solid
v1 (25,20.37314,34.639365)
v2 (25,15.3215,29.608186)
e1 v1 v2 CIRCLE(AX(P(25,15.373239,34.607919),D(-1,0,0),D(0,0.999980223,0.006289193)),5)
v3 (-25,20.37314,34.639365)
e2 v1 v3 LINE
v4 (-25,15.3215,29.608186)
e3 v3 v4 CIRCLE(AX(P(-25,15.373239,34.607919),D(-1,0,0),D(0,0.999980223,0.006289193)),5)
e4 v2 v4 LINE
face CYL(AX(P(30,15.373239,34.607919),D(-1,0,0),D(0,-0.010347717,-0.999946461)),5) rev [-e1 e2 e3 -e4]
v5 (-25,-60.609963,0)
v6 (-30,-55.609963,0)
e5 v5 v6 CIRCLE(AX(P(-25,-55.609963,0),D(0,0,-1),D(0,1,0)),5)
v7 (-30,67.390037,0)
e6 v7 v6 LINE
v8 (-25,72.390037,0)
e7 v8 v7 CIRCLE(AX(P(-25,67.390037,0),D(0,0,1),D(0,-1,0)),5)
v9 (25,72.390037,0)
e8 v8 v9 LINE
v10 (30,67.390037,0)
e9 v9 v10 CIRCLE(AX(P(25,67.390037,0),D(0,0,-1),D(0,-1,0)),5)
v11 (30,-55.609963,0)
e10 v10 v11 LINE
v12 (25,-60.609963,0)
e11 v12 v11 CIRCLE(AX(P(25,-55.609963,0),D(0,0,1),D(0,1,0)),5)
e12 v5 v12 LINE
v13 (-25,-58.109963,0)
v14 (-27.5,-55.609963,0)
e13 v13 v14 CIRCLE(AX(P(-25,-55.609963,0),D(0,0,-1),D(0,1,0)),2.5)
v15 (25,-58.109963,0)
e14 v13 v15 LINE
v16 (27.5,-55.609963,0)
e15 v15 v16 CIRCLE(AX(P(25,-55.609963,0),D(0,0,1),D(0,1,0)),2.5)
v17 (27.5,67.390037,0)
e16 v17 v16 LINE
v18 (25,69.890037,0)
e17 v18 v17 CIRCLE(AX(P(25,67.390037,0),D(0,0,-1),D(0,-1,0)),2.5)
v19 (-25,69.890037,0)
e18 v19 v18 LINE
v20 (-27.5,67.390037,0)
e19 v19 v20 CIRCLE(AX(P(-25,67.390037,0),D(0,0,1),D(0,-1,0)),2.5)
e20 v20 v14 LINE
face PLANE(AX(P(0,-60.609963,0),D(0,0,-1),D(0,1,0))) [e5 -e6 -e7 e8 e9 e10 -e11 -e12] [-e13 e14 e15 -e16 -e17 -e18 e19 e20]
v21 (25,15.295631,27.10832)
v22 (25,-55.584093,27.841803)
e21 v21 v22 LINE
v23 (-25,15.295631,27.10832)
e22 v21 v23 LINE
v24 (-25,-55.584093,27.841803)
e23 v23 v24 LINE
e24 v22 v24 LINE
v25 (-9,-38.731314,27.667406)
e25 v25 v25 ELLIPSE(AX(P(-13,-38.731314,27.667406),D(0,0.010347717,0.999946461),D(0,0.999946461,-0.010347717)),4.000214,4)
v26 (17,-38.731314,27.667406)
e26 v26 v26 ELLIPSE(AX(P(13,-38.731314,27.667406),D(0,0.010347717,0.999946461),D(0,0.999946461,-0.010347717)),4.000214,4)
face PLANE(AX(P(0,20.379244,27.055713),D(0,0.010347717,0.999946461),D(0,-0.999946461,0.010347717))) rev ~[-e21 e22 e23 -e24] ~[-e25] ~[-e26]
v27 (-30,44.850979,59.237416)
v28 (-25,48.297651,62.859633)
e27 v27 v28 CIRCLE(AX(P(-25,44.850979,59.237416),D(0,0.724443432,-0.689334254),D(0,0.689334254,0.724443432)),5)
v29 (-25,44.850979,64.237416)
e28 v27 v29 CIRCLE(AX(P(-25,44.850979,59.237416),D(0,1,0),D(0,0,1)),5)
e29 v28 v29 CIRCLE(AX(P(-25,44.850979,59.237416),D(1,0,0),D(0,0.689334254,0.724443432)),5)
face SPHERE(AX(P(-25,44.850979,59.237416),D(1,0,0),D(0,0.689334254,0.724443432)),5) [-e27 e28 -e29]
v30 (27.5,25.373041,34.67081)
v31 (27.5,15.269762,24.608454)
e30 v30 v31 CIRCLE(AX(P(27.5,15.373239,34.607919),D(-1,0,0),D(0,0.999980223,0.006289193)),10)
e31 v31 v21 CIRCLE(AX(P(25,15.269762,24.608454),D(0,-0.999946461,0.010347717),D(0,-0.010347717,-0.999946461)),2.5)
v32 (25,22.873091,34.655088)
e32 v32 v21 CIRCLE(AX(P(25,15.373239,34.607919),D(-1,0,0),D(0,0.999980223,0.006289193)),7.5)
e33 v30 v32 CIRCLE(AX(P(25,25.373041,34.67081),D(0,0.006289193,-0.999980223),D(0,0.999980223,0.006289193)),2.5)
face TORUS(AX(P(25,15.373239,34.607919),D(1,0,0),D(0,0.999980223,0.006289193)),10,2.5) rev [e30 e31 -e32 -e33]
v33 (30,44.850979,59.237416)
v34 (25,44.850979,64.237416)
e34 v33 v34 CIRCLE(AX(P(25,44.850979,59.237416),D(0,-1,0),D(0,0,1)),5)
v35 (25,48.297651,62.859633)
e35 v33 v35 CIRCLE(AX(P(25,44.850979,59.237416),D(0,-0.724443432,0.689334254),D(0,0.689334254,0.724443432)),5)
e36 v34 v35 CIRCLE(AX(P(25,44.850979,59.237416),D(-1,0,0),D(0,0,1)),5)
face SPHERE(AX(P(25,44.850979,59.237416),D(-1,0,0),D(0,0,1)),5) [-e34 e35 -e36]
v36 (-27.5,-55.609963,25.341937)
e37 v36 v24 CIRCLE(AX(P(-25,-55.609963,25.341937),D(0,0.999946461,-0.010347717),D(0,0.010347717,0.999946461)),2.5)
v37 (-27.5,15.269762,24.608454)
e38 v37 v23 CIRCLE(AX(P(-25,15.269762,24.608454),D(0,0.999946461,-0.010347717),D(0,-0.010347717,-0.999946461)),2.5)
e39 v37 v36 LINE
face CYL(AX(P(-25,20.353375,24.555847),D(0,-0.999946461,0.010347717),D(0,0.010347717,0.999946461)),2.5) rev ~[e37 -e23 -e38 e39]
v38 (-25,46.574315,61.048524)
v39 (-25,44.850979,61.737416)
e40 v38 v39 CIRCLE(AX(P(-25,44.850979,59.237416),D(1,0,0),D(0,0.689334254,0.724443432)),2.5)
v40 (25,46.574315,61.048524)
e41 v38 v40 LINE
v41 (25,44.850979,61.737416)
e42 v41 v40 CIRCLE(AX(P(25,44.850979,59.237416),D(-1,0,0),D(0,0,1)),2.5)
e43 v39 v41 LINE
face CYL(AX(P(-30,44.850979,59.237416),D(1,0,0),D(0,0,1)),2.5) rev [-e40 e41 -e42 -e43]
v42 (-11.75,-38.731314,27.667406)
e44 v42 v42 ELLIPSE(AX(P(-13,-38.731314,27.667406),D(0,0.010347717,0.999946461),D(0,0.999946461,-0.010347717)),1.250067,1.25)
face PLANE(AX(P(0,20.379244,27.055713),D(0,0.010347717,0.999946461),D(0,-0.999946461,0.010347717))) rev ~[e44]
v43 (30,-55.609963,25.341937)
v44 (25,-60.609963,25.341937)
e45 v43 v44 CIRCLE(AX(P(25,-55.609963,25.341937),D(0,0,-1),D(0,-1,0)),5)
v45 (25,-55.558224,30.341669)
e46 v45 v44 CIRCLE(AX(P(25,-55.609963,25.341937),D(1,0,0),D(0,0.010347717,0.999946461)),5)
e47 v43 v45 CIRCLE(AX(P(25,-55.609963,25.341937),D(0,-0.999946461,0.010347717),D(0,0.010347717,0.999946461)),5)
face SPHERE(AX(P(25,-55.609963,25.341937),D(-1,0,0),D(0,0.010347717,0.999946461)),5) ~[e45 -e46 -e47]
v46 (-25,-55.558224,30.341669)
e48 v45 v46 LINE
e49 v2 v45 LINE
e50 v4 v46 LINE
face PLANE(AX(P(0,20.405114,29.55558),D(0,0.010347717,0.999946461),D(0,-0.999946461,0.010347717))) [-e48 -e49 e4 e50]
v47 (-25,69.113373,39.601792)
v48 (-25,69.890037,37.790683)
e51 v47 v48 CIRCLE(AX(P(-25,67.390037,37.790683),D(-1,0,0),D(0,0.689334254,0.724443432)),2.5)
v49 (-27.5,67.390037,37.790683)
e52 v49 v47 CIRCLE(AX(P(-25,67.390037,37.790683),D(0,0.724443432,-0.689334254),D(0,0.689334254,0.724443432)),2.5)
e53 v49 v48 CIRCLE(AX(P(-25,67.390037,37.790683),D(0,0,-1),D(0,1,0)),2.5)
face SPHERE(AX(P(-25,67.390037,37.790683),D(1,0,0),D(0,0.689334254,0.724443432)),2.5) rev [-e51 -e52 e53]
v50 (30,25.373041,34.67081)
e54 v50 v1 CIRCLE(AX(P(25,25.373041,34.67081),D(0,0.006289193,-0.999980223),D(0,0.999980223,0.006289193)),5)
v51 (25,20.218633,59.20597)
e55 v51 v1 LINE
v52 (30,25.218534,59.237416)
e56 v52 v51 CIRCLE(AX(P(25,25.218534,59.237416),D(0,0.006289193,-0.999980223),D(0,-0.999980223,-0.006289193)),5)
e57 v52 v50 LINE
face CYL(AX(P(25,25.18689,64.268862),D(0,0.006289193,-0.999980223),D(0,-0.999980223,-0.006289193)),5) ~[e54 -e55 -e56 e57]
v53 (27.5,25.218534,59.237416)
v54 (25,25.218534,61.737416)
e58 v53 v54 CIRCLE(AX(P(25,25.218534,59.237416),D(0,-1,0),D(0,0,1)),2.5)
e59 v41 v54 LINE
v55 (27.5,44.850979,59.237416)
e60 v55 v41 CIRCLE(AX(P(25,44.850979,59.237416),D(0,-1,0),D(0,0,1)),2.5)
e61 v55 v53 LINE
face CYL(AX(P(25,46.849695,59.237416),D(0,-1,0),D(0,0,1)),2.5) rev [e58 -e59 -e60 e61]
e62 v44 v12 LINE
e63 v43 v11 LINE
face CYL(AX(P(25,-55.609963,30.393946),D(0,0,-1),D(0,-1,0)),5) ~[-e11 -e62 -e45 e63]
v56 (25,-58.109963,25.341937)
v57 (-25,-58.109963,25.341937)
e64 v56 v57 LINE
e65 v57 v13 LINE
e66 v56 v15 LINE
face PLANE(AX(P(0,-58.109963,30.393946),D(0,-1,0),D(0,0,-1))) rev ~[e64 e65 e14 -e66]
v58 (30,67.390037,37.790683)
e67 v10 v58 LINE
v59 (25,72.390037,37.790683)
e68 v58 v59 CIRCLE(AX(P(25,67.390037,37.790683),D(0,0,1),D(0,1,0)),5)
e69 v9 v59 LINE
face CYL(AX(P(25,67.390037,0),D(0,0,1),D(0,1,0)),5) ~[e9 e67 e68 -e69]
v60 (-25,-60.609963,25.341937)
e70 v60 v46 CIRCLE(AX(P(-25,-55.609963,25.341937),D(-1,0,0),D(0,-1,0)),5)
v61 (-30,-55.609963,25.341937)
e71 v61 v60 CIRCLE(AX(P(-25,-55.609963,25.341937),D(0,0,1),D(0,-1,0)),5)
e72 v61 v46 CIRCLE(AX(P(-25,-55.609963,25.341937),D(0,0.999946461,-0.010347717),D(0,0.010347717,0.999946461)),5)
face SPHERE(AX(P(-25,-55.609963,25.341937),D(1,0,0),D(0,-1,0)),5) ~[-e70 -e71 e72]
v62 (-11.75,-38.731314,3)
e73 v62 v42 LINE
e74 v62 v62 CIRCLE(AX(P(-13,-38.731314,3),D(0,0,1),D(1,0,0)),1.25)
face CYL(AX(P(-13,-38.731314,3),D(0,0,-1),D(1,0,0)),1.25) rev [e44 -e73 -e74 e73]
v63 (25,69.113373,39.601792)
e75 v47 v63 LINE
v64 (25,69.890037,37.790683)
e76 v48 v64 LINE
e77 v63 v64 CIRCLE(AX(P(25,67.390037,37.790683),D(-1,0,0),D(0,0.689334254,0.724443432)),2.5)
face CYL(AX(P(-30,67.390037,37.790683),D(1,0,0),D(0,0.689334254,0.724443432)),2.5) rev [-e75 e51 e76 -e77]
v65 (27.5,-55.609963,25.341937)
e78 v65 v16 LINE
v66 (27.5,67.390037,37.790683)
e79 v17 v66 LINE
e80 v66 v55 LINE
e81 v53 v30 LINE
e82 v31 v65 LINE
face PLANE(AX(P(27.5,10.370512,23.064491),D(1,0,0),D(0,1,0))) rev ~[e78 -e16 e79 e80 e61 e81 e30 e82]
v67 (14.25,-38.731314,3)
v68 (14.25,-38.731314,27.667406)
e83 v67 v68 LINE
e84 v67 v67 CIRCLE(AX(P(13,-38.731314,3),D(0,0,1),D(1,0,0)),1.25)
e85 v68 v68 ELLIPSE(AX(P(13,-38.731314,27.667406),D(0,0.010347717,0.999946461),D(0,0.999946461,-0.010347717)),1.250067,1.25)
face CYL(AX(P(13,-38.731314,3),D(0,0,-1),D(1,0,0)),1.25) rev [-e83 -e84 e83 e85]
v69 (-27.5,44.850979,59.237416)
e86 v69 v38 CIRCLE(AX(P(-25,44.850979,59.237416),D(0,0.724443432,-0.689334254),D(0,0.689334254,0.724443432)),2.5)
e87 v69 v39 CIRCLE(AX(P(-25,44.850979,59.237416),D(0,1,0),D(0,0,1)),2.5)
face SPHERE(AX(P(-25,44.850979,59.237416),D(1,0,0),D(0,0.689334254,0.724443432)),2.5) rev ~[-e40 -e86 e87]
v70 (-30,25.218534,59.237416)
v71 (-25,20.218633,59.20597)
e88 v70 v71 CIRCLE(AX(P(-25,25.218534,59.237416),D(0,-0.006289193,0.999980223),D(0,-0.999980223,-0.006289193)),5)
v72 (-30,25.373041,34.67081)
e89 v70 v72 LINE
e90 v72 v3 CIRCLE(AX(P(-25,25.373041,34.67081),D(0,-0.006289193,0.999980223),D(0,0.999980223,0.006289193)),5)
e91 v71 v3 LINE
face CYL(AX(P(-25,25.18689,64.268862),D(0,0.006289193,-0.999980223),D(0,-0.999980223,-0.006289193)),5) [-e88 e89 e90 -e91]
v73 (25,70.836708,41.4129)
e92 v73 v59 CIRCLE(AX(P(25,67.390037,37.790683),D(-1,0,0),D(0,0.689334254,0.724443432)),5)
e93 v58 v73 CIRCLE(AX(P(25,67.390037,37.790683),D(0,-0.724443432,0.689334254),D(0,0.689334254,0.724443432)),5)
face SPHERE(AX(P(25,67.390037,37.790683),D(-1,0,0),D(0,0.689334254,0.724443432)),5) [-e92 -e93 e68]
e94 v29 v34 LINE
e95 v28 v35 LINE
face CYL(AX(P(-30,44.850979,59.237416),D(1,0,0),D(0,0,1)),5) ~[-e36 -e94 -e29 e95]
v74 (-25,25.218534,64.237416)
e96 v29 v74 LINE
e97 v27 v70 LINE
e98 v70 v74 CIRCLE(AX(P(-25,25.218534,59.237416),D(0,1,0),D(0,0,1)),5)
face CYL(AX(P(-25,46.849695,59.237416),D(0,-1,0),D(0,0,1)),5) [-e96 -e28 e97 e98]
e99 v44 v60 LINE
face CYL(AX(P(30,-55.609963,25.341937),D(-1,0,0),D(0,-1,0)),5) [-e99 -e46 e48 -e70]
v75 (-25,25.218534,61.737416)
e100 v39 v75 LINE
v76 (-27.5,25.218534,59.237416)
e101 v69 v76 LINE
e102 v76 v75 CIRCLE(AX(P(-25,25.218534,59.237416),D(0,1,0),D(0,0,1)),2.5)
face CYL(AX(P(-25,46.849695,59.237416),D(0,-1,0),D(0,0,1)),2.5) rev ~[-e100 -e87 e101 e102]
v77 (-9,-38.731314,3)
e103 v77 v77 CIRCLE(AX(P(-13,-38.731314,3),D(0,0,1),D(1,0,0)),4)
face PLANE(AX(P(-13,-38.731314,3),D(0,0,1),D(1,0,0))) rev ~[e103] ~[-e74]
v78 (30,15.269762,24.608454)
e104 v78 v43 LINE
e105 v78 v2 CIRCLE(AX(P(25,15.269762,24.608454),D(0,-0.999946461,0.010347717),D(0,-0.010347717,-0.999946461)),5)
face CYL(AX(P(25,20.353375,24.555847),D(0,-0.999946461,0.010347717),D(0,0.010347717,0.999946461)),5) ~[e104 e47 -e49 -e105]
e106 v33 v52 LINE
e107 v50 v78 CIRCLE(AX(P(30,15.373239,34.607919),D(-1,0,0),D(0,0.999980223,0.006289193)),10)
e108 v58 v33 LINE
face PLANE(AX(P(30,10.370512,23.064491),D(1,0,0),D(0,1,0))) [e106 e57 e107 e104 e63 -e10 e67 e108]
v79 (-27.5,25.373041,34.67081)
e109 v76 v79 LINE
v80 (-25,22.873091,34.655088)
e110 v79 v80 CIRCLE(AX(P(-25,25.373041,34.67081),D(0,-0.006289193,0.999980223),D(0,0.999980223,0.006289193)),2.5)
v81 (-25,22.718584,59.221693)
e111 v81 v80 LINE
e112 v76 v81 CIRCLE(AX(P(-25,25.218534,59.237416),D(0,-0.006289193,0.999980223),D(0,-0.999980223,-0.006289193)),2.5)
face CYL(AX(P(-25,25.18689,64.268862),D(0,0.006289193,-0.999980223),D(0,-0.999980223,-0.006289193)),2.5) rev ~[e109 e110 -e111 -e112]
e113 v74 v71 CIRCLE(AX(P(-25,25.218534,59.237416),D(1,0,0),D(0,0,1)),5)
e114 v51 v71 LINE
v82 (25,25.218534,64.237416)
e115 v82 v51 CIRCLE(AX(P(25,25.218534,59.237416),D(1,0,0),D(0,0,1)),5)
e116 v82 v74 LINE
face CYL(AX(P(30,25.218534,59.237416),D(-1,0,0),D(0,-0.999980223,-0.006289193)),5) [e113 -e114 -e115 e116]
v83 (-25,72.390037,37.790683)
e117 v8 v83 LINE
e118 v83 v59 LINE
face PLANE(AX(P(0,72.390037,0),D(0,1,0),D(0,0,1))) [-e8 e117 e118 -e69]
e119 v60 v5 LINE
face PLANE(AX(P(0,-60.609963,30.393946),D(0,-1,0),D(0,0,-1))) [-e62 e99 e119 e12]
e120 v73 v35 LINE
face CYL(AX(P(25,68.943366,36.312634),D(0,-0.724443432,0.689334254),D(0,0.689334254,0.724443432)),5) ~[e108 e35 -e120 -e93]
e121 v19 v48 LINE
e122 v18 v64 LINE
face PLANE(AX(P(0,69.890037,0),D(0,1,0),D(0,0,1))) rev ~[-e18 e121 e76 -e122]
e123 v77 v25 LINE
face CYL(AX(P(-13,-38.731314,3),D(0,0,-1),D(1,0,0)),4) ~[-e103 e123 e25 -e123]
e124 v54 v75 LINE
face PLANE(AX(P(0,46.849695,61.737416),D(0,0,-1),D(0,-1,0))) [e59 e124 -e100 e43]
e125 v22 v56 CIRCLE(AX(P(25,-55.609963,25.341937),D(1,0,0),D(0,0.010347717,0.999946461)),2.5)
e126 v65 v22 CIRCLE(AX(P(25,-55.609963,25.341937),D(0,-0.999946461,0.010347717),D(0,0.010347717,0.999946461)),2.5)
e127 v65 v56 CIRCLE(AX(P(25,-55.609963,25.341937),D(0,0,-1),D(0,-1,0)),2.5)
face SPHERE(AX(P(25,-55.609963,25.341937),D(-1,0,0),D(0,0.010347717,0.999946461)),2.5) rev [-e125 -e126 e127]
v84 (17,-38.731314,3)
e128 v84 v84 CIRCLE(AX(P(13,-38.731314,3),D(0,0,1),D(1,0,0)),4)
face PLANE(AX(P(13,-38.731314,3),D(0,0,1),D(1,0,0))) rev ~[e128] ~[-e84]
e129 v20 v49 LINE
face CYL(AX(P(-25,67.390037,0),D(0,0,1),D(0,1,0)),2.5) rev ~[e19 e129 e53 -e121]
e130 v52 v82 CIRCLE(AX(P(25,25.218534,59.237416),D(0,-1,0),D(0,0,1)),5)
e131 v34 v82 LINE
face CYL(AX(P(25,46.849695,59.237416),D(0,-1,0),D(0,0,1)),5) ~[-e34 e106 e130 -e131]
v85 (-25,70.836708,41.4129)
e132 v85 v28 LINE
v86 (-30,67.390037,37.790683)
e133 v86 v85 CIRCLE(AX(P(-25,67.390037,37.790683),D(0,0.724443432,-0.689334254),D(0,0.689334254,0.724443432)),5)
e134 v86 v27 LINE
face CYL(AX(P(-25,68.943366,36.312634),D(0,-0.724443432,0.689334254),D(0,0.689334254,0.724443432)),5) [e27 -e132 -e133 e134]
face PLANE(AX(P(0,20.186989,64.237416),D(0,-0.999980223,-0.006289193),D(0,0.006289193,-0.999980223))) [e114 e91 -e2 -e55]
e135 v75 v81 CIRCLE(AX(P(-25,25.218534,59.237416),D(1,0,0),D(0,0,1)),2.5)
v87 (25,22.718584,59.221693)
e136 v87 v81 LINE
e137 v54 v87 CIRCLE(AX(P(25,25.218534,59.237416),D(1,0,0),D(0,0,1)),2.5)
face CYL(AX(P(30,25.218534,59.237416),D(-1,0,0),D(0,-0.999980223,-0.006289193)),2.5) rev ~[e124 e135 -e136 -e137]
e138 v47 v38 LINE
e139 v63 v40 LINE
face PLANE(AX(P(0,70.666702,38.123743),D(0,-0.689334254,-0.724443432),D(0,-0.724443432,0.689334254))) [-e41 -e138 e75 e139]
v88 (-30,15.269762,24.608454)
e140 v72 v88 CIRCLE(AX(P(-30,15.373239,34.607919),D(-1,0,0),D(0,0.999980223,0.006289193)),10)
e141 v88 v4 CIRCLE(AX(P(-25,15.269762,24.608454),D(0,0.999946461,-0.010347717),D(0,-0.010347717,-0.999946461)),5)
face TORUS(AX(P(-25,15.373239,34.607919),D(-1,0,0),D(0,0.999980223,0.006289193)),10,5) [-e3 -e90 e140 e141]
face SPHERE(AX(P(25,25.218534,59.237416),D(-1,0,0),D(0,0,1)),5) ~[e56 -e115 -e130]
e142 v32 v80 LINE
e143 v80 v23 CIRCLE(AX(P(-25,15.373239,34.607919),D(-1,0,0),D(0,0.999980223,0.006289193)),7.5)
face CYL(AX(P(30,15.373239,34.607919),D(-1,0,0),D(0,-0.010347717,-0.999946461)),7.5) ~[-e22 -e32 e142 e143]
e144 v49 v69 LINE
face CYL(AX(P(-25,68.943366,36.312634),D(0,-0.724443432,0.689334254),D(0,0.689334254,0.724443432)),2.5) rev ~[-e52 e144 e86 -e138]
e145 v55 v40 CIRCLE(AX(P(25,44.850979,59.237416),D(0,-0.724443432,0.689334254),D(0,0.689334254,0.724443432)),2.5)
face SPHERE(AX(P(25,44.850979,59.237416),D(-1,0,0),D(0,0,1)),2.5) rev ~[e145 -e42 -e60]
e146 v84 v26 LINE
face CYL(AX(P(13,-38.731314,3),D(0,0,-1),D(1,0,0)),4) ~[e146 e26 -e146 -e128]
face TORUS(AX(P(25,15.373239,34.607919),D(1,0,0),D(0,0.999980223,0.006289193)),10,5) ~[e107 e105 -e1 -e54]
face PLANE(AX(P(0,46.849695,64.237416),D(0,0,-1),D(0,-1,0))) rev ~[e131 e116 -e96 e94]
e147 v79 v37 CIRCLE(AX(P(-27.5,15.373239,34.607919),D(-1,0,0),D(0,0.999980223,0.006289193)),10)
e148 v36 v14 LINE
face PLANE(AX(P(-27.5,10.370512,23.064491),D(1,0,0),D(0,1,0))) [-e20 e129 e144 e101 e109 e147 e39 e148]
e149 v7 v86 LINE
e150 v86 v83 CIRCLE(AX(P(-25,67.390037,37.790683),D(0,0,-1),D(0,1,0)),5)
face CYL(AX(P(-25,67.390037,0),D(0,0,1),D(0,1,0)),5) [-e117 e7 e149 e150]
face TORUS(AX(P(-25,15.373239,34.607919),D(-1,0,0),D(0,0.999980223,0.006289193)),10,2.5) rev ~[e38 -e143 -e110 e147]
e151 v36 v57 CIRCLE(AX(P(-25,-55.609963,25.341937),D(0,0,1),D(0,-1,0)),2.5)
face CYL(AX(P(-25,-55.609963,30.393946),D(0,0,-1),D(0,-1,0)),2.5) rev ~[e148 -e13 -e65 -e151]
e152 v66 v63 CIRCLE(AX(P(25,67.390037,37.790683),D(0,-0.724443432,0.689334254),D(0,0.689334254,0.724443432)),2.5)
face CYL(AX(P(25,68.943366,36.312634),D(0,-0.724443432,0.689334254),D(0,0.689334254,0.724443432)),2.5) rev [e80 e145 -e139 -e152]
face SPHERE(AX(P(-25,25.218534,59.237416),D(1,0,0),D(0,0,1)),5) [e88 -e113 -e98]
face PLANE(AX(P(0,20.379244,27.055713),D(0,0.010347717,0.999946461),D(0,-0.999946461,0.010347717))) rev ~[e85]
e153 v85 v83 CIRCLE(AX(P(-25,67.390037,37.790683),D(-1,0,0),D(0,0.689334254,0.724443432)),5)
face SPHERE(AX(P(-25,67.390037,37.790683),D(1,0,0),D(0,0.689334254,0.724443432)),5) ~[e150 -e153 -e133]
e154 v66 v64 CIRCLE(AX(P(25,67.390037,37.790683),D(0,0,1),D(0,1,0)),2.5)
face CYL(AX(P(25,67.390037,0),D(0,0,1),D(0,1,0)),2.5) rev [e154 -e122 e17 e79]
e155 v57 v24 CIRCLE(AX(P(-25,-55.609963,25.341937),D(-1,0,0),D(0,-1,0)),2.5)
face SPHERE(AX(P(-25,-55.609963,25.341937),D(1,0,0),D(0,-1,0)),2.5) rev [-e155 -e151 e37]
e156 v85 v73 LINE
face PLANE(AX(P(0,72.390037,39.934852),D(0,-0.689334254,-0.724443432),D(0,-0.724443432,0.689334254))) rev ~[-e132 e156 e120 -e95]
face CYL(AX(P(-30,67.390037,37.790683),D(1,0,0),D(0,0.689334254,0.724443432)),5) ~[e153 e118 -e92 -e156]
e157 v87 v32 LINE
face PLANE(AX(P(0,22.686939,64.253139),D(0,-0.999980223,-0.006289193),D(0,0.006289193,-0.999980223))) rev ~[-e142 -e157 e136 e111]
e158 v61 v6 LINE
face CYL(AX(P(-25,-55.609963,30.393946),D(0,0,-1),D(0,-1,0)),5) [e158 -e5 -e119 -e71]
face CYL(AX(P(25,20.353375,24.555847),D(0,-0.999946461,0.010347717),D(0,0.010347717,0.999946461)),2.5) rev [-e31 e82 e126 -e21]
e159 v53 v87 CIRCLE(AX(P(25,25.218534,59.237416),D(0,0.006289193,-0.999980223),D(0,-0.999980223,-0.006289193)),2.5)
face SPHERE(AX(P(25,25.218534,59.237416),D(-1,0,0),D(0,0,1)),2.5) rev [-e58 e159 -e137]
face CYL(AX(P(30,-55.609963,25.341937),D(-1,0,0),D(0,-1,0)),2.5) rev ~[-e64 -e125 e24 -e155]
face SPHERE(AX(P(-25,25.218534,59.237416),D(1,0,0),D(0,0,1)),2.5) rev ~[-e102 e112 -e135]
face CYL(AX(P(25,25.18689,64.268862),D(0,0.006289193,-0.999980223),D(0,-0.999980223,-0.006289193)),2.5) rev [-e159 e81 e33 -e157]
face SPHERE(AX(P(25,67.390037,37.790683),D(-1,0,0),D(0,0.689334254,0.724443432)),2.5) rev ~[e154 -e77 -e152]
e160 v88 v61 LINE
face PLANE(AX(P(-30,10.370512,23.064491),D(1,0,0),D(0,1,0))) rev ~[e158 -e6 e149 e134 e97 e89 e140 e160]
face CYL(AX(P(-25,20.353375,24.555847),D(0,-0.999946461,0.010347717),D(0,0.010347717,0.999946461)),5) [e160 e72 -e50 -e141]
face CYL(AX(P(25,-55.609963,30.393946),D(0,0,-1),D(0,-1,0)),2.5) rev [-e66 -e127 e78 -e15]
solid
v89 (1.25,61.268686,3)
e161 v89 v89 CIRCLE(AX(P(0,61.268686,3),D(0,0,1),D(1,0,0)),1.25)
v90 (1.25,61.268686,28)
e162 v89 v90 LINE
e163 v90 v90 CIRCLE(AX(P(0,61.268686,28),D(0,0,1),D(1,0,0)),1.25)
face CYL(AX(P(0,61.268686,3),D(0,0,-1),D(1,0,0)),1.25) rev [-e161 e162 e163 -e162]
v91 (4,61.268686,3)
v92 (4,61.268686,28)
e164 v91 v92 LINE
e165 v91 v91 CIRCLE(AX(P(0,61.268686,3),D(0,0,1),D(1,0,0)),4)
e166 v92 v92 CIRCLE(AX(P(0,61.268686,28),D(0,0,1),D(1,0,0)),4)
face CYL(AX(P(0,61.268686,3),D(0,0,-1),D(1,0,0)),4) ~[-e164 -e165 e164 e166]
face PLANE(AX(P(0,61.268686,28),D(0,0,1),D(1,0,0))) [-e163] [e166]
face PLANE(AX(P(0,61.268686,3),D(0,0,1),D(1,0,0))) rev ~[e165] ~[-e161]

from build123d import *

# Parameters (mm, degrees)
F3_DEPTH  = 30
F4_DEPTH  = 12.5
F5_DEPTH  = 12.5
F6_DEPTH  = 12.5
F7_DEPTH  = 12.5
F8_DEPTH  = 30
F9_R      = 5
F10_T     = -2.5
F2_R      = 4
F2_R_2    = 1.25
F11_DEPTH = 25


with BuildPart() as f3:
    # F0 (on Right) → F3 (new body, symmetric)
    with BuildSketch(Plane.YZ):
        with BuildLine():
            Line((-60.6099627912, 30.3939455835), (-60.6099627912, 0))
            Line((-60.6099627912, 0), (-40.8299627912, 0))
            ThreePointArc((-40.8299627912, 0), (-28.8299627912, 12), (-16.8299627912, 0))
            Line((-16.8299627912, 0), (30.5578776426, 0))
            ThreePointArc((30.5578776426, 0), (41.3865220854, 13.9579662735), (54.3900372088, 2))
            ThreePointArc((54.3900372088, 2), (54.3480034823, 0.9964848766), (54.222196775, 0))
            Line((54.222196775, 0), (72.3900372088, 0))
            Line((72.3900372088, 0), (72.3900372088, 39.934851595))
            Line((72.3900372088, 39.934851595), (46.8496945841, 64.2374157906))
            Line((46.8496945841, 64.2374157906), (20.1869886369, 64.2374157906))
            Line((20.1869886369, 64.2374157906), (20.4051136971, 29.5555796474))
            Line((20.4051136971, 29.5555796474), (-60.6099627912, 30.3939455835))
        make_face()
    extrude(amount=F3_DEPTH, both=True)

    # F0 (on Right) → F4 (join, symmetric)
    with BuildSketch(Plane.YZ):
        with BuildLine():
            Line((-60.6099627912, 30.3939455835), (-60.6099627912, 0))
            Line((-60.6099627912, 0), (-40.8299627912, 0))
            ThreePointArc((-40.8299627912, 0), (-28.8299627912, 12), (-16.8299627912, 0))
            Line((-16.8299627912, 0), (30.5578776426, 0))
            ThreePointArc((30.5578776426, 0), (41.3865220854, 13.9579662735), (54.3900372088, 2))
            ThreePointArc((54.3900372088, 2), (54.3480034823, 0.9964848766), (54.222196775, 0))
            Line((54.222196775, 0), (72.3900372088, 0))
            Line((72.3900372088, 0), (72.3900372088, 39.934851595))
            Line((72.3900372088, 39.934851595), (46.8496945841, 64.2374157906))
            Line((46.8496945841, 64.2374157906), (20.1869886369, 64.2374157906))
            Line((20.1869886369, 64.2374157906), (20.4051136971, 29.5555796474))
            Line((20.4051136971, 29.5555796474), (-60.6099627912, 30.3939455835))
        make_face()
    extrude(amount=F4_DEPTH, both=True)

    # F0 (on Right) → F5 (join, symmetric)
    with BuildSketch(Plane.YZ):
        with BuildLine():
            Line((-60.6099627912, 30.3939455835), (-60.6099627912, 0))
            Line((-60.6099627912, 0), (-40.8299627912, 0))
            ThreePointArc((-40.8299627912, 0), (-28.8299627912, 12), (-16.8299627912, 0))
            Line((-16.8299627912, 0), (30.5578776426, 0))
            ThreePointArc((30.5578776426, 0), (41.3865220854, 13.9579662735), (54.3900372088, 2))
            ThreePointArc((54.3900372088, 2), (54.3480034823, 0.9964848766), (54.222196775, 0))
            Line((54.222196775, 0), (72.3900372088, 0))
            Line((72.3900372088, 0), (72.3900372088, 39.934851595))
            Line((72.3900372088, 39.934851595), (46.8496945841, 64.2374157906))
            Line((46.8496945841, 64.2374157906), (20.1869886369, 64.2374157906))
            Line((20.1869886369, 64.2374157906), (20.4051136971, 29.5555796474))
            Line((20.4051136971, 29.5555796474), (-60.6099627912, 30.3939455835))
        make_face()
    extrude(amount=F5_DEPTH, both=True)

    # F0 (on Right) → F6 (join, symmetric)
    with BuildSketch(Plane.YZ):
        with BuildLine():
            Line((-60.6099627912, 30.3939455835), (-60.6099627912, 0))
            Line((-60.6099627912, 0), (-40.8299627912, 0))
            ThreePointArc((-40.8299627912, 0), (-28.8299627912, 12), (-16.8299627912, 0))
            Line((-16.8299627912, 0), (30.5578776426, 0))
            ThreePointArc((30.5578776426, 0), (41.3865220854, 13.9579662735), (54.3900372088, 2))
            ThreePointArc((54.3900372088, 2), (54.3480034823, 0.9964848766), (54.222196775, 0))
            Line((54.222196775, 0), (72.3900372088, 0))
            Line((72.3900372088, 0), (72.3900372088, 39.934851595))
            Line((72.3900372088, 39.934851595), (46.8496945841, 64.2374157906))
            Line((46.8496945841, 64.2374157906), (20.1869886369, 64.2374157906))
            Line((20.1869886369, 64.2374157906), (20.4051136971, 29.5555796474))
            Line((20.4051136971, 29.5555796474), (-60.6099627912, 30.3939455835))
        make_face()
    extrude(amount=F6_DEPTH, both=True)

    # F0 (on Right) → F7 (join, symmetric)
    with BuildSketch(Plane.YZ):
        with BuildLine():
            Line((-60.6099627912, 30.3939455835), (-60.6099627912, 0))
            Line((-60.6099627912, 0), (-40.8299627912, 0))
            ThreePointArc((-40.8299627912, 0), (-28.8299627912, 12), (-16.8299627912, 0))
            Line((-16.8299627912, 0), (30.5578776426, 0))
            ThreePointArc((30.5578776426, 0), (41.3865220854, 13.9579662735), (54.3900372088, 2))
            ThreePointArc((54.3900372088, 2), (54.3480034823, 0.9964848766), (54.222196775, 0))
            Line((54.222196775, 0), (72.3900372088, 0))
            Line((72.3900372088, 0), (72.3900372088, 39.934851595))
            Line((72.3900372088, 39.934851595), (46.8496945841, 64.2374157906))
            Line((46.8496945841, 64.2374157906), (20.1869886369, 64.2374157906))
            Line((20.1869886369, 64.2374157906), (20.4051136971, 29.5555796474))
            Line((20.4051136971, 29.5555796474), (-60.6099627912, 30.3939455835))
        make_face()
    extrude(amount=F7_DEPTH, both=True)

    # F0 (on Right) → F8 (join, symmetric)
    with BuildSketch(Plane.YZ):
        with BuildLine():
            ThreePointArc((-16.8299627912, 0), (-28.8299627912, 12), (-40.8299627912, 0))
            Line((-40.8299627912, 0), (-16.8299627912, 0))
        make_face()
        with BuildLine():
            ThreePointArc((54.3900372088, 2), (41.3865220854, 13.9579662735), (30.5578776426, 0))
            Line((30.5578776426, 0), (54.222196775, 0))
            ThreePointArc((54.222196775, 0), (54.3480034823, 0.9964848766), (54.3900372088, 2))
        make_face()
    extrude(amount=F8_DEPTH, both=True)

    # F9
    f9_edges = [f3.edges().sort_by_distance(p)[0] for p in [
        (-30, -20.102425, 29.974763),
        (0, -60.609963, 30.393946),
        (30, -20.102425, 29.974763),
        (0, 20.405114, 29.55558),
        (0, 20.186989, 64.237416),
        (-30, 33.518342, 64.237416),
        (0, 46.849695, 64.237416),
        (30, 33.518342, 64.237416),
        (-30, -60.609963, 15.196973),
        (30, -60.609963, 15.196973),
        (-30, 59.619866, 52.086134),
        (-30, 72.390037, 19.967426),
        (0, 72.390037, 39.934852),
        (30, 59.619866, 52.086134),
        (30, 72.390037, 19.967426),
        (30, 20.296051, 46.896498),
        (-30, 20.296051, 46.896498),
    ]]
    fillet(f9_edges, radius=F9_R)

    # F10
    f10_openings = [f3.faces().sort_by_distance(p)[0] for p in [
        (0, 5.890037, 0),
    ]]
    offset(amount=F10_T, openings=f10_openings)

    # F2 (on offset) → F11, piece 2 (join)
    with BuildSketch(Plane.XY.offset(3)):
        with Locations((13, -38.7313138237)):
            Circle(F2_R)
        with Locations((13, -38.7313138237)):
            Circle(F2_R_2, mode=Mode.SUBTRACT)
        with Locations((-13, -38.7313138237)):
            Circle(F2_R)
        with Locations((-13, -38.7313138237)):
            Circle(F2_R_2, mode=Mode.SUBTRACT)
    extrude(amount=F11_DEPTH)


with BuildPart() as f11:
    # F2 (on offset) → F11 (new body)
    with BuildSketch(Plane.XY.offset(3)):
        with Locations((0, 61.2686861763)):
            Circle(F2_R)
        with Locations((0, 61.2686861763)):
            Circle(F2_R_2, mode=Mode.SUBTRACT)
    extrude(amount=F11_DEPTH)


solid = Compound([f3.part, f11.part])
